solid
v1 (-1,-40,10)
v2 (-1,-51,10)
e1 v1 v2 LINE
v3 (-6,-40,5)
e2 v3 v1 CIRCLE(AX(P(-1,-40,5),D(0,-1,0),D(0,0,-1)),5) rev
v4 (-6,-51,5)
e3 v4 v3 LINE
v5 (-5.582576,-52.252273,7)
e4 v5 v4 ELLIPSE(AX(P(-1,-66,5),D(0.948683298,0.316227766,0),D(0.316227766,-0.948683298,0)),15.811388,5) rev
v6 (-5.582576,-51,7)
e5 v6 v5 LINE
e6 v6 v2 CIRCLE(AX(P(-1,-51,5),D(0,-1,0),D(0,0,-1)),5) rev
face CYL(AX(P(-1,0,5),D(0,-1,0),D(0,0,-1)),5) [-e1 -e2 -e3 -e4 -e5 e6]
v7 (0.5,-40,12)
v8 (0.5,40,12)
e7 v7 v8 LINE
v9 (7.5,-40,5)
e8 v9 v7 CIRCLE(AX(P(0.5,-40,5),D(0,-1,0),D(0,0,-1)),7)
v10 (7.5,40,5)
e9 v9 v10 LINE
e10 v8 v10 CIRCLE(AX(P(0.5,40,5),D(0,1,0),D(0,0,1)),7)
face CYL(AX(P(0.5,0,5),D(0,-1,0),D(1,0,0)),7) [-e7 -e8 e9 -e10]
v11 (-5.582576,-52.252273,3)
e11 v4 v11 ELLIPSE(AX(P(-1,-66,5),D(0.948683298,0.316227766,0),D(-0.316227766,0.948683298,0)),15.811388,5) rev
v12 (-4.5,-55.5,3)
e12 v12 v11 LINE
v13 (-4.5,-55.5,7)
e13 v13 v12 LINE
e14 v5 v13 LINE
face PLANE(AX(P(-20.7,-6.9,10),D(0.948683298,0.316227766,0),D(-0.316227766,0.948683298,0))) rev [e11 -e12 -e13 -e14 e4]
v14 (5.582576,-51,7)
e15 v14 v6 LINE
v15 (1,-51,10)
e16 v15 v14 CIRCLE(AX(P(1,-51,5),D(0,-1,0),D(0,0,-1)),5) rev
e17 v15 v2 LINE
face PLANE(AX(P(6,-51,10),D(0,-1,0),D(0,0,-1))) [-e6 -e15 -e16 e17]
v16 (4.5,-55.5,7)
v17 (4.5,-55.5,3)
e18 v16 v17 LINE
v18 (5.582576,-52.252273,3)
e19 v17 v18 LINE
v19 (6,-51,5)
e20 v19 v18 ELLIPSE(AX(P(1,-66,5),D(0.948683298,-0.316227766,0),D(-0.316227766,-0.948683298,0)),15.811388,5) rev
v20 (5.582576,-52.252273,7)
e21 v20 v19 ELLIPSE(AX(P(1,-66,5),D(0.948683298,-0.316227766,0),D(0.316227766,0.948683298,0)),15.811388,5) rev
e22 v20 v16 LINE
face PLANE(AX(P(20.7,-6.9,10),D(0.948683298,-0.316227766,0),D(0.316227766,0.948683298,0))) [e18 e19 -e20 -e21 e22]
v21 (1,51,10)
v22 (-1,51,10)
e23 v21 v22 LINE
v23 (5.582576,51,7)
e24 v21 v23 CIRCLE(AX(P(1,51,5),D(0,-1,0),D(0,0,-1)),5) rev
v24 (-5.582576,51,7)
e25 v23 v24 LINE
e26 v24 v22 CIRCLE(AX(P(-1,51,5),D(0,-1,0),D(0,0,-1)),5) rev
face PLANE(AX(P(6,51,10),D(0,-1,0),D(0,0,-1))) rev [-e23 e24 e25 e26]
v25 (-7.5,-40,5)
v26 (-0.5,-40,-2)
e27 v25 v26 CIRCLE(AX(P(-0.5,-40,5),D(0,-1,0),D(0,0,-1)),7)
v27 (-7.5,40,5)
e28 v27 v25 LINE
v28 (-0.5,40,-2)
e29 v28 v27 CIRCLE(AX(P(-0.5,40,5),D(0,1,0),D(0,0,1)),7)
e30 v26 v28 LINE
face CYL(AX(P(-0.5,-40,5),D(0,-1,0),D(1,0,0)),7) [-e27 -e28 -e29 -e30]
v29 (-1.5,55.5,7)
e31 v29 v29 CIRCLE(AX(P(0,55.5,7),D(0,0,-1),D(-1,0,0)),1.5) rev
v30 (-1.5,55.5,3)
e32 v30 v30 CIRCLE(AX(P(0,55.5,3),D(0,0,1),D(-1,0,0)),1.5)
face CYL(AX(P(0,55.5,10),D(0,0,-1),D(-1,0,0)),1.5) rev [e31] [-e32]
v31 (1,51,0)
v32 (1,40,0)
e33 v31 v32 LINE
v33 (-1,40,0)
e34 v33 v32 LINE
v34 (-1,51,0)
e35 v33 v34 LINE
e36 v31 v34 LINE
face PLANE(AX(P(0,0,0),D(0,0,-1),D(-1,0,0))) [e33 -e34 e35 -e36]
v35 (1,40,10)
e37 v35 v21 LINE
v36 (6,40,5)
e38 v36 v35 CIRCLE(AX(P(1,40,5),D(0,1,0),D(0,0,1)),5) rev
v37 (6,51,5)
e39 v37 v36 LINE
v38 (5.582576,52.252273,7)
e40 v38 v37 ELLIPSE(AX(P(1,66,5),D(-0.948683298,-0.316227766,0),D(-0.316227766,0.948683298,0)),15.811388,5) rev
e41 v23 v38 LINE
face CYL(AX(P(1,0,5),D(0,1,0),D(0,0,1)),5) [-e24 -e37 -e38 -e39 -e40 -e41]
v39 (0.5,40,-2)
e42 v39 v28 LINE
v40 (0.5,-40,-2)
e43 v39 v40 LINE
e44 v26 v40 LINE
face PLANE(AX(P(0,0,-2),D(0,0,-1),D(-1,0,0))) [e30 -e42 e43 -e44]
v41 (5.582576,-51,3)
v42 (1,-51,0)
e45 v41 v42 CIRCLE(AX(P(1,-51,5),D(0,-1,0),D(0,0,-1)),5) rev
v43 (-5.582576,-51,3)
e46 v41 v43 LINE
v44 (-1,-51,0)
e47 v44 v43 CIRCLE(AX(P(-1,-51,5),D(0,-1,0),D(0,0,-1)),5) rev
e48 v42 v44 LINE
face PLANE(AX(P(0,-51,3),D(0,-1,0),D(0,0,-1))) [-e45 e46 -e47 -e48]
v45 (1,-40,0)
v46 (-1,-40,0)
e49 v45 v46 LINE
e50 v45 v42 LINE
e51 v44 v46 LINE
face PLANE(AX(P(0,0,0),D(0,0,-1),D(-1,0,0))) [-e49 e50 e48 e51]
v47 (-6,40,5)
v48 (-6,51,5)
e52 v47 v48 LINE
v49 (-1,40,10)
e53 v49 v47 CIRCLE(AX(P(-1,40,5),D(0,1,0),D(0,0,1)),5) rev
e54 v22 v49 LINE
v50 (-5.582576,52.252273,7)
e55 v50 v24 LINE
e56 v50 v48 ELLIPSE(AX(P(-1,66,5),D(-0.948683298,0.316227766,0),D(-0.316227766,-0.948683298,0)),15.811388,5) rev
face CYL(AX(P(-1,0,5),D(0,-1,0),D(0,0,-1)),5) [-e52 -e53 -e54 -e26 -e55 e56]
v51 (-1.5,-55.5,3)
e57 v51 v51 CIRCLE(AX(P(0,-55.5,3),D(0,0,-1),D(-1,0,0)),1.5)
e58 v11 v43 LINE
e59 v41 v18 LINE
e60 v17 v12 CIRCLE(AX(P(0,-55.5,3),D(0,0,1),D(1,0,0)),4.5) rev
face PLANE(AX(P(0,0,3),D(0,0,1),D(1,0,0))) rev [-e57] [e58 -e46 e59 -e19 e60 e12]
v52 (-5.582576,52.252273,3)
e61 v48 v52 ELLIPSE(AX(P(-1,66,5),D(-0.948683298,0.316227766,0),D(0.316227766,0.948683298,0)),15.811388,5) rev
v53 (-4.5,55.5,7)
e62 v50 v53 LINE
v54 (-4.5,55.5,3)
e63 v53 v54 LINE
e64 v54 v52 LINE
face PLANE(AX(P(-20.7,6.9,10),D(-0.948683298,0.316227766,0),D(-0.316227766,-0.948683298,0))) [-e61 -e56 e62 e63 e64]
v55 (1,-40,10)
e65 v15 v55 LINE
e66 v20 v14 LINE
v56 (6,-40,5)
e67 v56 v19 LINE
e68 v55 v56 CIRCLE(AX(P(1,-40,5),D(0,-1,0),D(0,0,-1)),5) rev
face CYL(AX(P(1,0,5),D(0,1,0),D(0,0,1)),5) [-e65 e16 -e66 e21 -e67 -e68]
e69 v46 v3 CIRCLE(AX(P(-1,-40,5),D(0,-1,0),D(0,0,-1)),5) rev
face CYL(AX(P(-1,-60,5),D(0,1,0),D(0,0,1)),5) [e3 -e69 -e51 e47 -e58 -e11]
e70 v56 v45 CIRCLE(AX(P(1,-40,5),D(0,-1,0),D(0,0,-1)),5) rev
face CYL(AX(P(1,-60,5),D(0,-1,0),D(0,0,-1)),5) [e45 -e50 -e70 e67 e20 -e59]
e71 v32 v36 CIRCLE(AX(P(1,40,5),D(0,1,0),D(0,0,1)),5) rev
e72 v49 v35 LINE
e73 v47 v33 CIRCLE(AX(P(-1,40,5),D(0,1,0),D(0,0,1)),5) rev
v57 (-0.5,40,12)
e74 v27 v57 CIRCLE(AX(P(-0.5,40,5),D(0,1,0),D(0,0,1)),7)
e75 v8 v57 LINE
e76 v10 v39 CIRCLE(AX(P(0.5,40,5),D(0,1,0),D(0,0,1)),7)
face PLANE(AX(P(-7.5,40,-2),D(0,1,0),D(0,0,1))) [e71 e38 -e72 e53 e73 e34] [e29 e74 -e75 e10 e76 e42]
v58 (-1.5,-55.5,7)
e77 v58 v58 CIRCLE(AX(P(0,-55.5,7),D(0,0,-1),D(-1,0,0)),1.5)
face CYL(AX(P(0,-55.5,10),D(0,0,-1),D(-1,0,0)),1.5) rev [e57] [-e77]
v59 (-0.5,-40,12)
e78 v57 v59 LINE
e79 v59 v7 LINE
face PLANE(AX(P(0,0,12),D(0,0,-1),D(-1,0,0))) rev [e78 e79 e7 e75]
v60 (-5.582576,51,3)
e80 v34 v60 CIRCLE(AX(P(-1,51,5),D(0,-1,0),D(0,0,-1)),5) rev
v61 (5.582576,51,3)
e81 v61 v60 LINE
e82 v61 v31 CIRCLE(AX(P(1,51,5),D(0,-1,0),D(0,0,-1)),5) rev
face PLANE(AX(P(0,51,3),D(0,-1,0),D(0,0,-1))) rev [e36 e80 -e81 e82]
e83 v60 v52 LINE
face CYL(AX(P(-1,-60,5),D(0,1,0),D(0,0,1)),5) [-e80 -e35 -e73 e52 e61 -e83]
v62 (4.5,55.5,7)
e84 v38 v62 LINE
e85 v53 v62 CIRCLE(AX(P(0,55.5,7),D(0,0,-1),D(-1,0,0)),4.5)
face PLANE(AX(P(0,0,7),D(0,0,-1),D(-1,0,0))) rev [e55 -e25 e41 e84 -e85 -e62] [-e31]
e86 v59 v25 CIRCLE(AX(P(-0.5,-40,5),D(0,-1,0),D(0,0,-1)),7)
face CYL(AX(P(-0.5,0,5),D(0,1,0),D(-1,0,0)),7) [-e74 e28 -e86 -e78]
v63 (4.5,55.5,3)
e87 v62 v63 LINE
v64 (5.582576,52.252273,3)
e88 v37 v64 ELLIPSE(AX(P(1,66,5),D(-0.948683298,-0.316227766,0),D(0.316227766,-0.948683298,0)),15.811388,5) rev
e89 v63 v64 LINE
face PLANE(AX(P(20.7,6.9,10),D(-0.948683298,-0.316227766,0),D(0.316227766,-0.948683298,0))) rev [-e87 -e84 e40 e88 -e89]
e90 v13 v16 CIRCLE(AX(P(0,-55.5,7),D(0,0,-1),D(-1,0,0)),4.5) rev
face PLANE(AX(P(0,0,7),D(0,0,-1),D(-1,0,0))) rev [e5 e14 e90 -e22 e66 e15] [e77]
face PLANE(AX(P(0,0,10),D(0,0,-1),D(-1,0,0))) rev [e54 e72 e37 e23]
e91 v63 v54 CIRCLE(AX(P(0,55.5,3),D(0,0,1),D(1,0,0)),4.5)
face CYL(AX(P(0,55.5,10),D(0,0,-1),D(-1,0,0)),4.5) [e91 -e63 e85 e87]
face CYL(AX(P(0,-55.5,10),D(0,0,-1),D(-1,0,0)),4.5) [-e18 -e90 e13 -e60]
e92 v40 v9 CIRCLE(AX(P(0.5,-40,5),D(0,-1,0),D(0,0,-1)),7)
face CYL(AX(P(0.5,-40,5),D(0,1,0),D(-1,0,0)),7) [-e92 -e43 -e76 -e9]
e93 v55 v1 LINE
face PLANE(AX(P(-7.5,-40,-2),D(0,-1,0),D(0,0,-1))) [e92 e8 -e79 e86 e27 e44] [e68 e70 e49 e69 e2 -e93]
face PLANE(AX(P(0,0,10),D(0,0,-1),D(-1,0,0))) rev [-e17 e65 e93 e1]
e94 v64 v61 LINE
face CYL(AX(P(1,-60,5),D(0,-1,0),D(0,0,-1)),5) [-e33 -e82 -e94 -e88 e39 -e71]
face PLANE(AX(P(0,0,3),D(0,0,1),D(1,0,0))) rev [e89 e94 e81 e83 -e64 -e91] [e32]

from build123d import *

# Parameters (mm, degrees)
SKETCH2_W                = 12
SKETCH2_H                = 120
BOSS_EXTRUDE1_DEPTH      = 10
FILLET1_R                = 5
CUT_EXTRUDE1_DEPTH       = 3
CUT_EXTRUDE2_START       = 7
SKETCH3_2_W              = 12
SKETCH3_2_H              = 9
CUT_EXTRUDE2_DEPTH       = 3
CUT_EXTRUDE4_START       = -4
CUT_EXTRUDE4_DEPTH       = 66.12282716
SKETCH7_R                = 1.5
CUT_EXTRUDE5_DEPTH       = 61.704200843
BOSS_EXTRUDE2_DEPTH      = 7
BOSS_EXTRUDE2_DEPTH_BACK = 7
SKETCH9_W                = 15
SKETCH9_H                = 80
FILLET3_R                = 7


with BuildPart() as part:
    # Sketch2 → Boss-Extrude1 (new body)
    with BuildSketch(Plane.XY):
        Rectangle(SKETCH2_W, SKETCH2_H)
    extrude(amount=BOSS_EXTRUDE1_DEPTH)

    # Fillet1
    fillet1_edges = [part.edges().sort_by_distance(p)[0] for p in [
        (-6, 0, 0),
        (6, 0, 0),
        (6, 0, 10),
        (-6, 0, 10),
    ]]
    fillet(fillet1_edges, radius=FILLET1_R - 0.0001)  # a hair under: the kernel refuses the full size

    # Sketch3 → Cut-Extrude1 (cut)
    with BuildSketch(Plane.XY):
        with BuildLine():
            Line((-6, -51), (-4.5, -55.5))
            ThreePointArc((-4.5, -55.5), (0, -60), (4.5, -55.5))
            Line((4.5, -55.5), (6, -51))
            Line((6, -51), (-6, -51))
        make_face()
        with BuildLine():
            Line((0, -60), (6, -60))
            Line((6, -60), (6, -51))
            Line((6, -51), (4.5, -55.5))
            ThreePointArc((4.5, -55.5), (3.181980515, -58.681980515), (0, -60))
        make_face()
        with BuildLine():
            Line((-6, -60), (0, -60))
            ThreePointArc((0, -60), (-3.181980515, -58.681980515), (-4.5, -55.5))
            Line((-4.5, -55.5), (-6, -51))
            Line((-6, -51), (-6, -60))
        make_face()
    cut_extrude1 = extrude(amount=CUT_EXTRUDE1_DEPTH, mode=Mode.SUBTRACT)

    # Sketch3<2> → Cut-Extrude2 (cut)
    with BuildSketch(Plane.XY.offset(CUT_EXTRUDE2_START)):
        with Locations((0, -55.5)):
            Rectangle(SKETCH3_2_W, SKETCH3_2_H)
    cut_extrude2 = extrude(amount=CUT_EXTRUDE2_DEPTH, mode=Mode.SUBTRACT)

    # Mirror1: Cut-Extrude1, Cut-Extrude2 across plane
    add(cut_extrude1.mirror(Plane.ZX), mode=Mode.SUBTRACT)
    add(cut_extrude2.mirror(Plane.ZX), mode=Mode.SUBTRACT)

    # Sketch3<4> → Cut-Extrude4 (cut)
    with BuildSketch(Plane.XY.offset(CUT_EXTRUDE4_START)):
        with BuildLine():
            Line((0, -60), (6, -60))
            Line((6, -60), (6, -51))
            Line((6, -51), (4.5, -55.5))
            ThreePointArc((4.5, -55.5), (3.181980515, -58.681980515), (0, -60))
        make_face()
        with BuildLine():
            Line((-6, -60), (0, -60))
            ThreePointArc((0, -60), (-3.181980515, -58.681980515), (-4.5, -55.5))
            Line((-4.5, -55.5), (-6, -51))
            Line((-6, -51), (-6, -60))
        make_face()
    cut_extrude4 = extrude(amount=CUT_EXTRUDE4_DEPTH, mode=Mode.SUBTRACT)

    # Sketch7 → Cut-Extrude5 (cut, through all)
    with BuildSketch(Plane(origin=(0, 0, 3), x_dir=(-1, 0, 0), z_dir=(0, 0, -1))):
        with Locations((0, -55.5)):
            Circle(SKETCH7_R)
    cut_extrude5 = extrude(amount=-CUT_EXTRUDE5_DEPTH, mode=Mode.SUBTRACT)

    # Mirror3: Cut-Extrude5 across plane
    add(cut_extrude5.mirror(Plane.ZX), mode=Mode.SUBTRACT)

    # Mirror4: Cut-Extrude4 across plane
    add(cut_extrude4.mirror(Plane.ZX), mode=Mode.SUBTRACT)

    # Sketch9 → Boss-Extrude2 (add, two sides: drawn at the far end of the back side and taken through both)
    with BuildSketch(Plane.XY.offset(5).offset(-BOSS_EXTRUDE2_DEPTH_BACK)):
        Rectangle(SKETCH9_W, SKETCH9_H)
    extrude(amount=BOSS_EXTRUDE2_DEPTH + BOSS_EXTRUDE2_DEPTH_BACK)

    # Fillet3
    fillet3_edges = [part.edges().sort_by_distance(p)[0] for p in [
        (-7.5, 0, 12),
        (7.5, 0, 12),
        (7.5, 0, -2),
        (-7.5, 0, -2),
    ]]
    fillet(fillet3_edges, radius=FILLET3_R - 0.0001)  # a hair under: the kernel refuses the full size


solid = part.part
